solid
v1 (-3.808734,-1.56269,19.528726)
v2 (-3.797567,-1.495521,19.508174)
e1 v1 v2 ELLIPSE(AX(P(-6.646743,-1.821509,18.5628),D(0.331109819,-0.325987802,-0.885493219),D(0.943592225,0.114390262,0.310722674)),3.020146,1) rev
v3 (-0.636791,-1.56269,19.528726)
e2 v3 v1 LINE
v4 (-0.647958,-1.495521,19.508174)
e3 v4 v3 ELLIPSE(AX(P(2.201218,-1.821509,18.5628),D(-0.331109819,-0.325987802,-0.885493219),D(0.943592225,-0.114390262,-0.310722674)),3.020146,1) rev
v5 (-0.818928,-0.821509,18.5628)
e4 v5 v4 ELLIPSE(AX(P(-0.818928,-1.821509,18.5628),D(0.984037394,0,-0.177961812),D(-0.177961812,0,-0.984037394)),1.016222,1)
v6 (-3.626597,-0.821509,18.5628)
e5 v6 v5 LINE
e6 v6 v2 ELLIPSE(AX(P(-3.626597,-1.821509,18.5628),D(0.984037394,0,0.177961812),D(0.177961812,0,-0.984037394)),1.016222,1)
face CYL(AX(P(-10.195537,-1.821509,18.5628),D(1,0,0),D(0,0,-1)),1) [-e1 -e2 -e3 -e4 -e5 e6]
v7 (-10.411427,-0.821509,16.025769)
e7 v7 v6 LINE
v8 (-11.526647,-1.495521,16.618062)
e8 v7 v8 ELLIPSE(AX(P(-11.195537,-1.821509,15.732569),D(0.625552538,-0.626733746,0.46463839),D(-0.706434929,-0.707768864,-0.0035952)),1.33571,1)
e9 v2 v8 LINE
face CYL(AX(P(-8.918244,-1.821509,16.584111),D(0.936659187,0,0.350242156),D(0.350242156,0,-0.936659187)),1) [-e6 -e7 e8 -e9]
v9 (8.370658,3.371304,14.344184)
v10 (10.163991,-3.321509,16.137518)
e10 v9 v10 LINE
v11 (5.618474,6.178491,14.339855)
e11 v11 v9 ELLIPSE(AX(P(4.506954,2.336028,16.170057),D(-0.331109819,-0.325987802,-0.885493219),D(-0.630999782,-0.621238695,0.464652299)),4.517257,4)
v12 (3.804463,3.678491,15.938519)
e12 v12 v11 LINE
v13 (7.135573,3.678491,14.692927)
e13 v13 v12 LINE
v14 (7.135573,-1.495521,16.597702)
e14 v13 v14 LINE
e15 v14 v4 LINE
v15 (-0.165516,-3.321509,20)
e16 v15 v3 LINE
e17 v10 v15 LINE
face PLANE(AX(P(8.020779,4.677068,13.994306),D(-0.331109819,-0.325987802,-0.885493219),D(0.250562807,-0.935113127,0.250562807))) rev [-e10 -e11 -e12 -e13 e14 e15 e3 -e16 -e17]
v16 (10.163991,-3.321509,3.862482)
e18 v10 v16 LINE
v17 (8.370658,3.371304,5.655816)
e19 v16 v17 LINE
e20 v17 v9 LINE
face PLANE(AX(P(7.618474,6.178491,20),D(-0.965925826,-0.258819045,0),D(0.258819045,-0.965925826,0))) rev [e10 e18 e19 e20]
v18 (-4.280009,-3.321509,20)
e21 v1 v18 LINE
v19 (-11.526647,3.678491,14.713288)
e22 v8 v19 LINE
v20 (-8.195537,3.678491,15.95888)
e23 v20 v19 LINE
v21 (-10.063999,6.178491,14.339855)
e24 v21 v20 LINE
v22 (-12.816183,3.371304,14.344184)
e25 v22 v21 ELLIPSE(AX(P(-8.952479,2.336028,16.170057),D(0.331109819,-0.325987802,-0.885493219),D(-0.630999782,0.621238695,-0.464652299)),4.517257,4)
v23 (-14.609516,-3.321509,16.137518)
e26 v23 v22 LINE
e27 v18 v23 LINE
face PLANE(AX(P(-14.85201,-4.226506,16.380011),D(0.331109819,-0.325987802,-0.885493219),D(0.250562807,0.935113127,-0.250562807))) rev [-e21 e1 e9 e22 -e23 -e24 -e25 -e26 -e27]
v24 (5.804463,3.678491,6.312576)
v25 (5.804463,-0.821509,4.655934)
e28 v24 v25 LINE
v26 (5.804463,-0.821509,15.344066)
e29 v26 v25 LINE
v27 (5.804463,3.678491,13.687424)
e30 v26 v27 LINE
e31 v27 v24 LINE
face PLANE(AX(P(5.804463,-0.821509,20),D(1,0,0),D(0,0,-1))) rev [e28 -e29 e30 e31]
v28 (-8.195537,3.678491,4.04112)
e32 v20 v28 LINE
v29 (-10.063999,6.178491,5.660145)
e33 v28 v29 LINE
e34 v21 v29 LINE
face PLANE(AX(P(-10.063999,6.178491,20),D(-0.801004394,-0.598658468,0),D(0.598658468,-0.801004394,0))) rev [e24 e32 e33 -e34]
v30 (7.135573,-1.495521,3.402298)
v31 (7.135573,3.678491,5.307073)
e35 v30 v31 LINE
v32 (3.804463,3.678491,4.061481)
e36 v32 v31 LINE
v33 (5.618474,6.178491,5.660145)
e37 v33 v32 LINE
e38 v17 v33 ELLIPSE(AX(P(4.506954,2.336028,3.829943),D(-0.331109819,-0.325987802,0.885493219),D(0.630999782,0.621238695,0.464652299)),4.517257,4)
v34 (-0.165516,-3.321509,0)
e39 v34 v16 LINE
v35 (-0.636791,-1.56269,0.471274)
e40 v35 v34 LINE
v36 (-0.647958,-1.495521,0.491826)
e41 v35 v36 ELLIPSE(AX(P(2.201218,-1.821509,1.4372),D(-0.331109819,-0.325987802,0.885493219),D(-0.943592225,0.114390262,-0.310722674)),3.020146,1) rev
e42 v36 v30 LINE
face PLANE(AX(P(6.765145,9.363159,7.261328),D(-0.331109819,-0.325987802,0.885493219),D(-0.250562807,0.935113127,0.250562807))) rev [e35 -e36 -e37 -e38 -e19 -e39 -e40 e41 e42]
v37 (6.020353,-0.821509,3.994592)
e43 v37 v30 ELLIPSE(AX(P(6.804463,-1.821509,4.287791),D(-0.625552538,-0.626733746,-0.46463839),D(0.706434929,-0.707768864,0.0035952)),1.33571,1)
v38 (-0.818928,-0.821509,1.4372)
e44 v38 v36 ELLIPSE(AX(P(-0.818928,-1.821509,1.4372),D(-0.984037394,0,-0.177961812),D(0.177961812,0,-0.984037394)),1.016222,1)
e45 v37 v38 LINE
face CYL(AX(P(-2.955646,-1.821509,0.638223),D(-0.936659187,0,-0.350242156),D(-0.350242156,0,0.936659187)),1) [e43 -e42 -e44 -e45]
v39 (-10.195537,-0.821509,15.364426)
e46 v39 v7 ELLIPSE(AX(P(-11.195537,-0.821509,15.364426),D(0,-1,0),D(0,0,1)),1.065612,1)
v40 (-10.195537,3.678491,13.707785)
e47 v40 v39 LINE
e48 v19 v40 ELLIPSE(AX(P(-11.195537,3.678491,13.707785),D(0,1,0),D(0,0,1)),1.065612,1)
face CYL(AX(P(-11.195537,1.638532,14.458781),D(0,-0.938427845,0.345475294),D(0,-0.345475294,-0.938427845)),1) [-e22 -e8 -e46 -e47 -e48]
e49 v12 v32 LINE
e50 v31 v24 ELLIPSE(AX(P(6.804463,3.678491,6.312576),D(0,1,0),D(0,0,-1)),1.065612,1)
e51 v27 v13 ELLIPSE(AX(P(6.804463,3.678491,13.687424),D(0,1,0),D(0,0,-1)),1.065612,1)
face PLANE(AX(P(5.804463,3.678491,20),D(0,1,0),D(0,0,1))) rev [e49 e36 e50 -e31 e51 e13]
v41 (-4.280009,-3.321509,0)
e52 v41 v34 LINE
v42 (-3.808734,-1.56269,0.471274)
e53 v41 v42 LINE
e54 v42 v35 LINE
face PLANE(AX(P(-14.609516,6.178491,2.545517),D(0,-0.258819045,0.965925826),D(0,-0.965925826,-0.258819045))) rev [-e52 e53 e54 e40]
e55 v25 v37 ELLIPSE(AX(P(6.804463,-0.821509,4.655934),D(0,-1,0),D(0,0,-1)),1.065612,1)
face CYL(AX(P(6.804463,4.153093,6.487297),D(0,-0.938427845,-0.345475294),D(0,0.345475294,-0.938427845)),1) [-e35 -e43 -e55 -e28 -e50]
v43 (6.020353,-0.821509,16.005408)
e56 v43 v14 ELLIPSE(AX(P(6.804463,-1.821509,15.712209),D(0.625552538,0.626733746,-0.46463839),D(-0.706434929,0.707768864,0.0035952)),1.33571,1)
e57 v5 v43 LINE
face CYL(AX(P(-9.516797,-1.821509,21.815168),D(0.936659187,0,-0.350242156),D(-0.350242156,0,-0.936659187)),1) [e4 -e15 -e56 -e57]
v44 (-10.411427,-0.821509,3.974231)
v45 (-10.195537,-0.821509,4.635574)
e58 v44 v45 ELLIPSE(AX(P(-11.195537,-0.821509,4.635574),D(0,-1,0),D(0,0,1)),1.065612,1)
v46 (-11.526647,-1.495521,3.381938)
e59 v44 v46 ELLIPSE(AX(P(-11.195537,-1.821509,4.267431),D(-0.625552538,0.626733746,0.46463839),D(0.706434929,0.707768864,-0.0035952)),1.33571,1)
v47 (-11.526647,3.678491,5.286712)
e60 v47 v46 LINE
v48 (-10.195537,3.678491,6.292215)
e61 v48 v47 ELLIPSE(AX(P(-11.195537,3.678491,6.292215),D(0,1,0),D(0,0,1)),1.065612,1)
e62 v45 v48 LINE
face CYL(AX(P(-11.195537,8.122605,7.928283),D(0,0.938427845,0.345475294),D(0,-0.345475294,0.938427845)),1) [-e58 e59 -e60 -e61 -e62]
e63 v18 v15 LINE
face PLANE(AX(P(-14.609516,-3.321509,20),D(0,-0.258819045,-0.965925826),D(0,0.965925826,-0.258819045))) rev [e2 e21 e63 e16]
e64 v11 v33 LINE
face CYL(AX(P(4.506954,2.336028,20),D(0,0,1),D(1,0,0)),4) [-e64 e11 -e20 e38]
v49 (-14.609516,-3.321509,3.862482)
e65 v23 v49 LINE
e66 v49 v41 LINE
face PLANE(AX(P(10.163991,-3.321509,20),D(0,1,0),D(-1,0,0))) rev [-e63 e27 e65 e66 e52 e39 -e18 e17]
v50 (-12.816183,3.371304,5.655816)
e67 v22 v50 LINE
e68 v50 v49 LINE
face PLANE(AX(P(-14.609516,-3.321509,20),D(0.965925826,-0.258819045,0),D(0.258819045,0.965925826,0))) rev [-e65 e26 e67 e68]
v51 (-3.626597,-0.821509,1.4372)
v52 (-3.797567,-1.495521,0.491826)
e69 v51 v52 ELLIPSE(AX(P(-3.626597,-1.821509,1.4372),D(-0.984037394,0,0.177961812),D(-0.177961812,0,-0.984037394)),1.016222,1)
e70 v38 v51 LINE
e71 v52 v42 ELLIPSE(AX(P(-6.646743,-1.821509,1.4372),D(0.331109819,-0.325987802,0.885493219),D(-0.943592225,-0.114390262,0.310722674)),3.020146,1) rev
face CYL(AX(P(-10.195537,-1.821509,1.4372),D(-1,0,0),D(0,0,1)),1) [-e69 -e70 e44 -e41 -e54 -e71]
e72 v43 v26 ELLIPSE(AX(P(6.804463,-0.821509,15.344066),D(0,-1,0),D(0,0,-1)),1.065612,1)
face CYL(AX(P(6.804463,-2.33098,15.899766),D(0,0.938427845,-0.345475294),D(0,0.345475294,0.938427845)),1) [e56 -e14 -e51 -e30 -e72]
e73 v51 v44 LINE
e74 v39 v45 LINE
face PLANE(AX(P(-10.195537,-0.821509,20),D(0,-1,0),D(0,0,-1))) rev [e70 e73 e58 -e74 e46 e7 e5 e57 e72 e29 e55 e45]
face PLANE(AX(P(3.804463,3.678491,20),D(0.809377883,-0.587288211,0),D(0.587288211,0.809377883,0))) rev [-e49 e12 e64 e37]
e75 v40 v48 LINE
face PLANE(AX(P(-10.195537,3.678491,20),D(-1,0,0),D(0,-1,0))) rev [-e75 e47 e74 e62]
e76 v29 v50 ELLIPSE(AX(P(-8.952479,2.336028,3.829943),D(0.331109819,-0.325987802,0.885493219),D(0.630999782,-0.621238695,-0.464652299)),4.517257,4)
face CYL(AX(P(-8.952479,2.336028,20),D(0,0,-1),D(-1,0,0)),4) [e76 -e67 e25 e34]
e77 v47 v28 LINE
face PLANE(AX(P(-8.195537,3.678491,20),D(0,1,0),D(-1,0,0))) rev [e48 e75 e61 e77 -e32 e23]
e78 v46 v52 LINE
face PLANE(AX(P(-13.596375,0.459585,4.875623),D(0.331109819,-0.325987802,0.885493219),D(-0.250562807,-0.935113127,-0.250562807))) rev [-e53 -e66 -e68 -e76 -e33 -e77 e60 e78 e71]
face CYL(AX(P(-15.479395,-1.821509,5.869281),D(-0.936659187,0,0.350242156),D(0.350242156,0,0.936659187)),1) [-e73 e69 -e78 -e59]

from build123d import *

# Parameters (mm, degrees)
EXTRUDE_1_DEPTH          = 20
CUT_EXTRUDE_1_DEPTH      = 26.52668646
CUT_EXTRUDE_1_DEPTH_BACK = 26.52668646
FILLET_1_R               = 4
CHAMFER_1_SIZE           = 10
CHAMFER_1_SIZE_2         = 3.739269956
FILLET_2_R               = 1


with BuildPart() as part:
    # 草圖2 → 填料-伸長1 (new body)
    with BuildSketch(Plane.XY):
        Polygon((-8.195537152, 3.678491207), (-10.195537152, 3.678491207), (-10.195537152, -0.821508793), (5.804462848, -0.821508793), (5.804462848, 3.678491207), (3.804462848, 3.678491207), (5.618474025, 6.178491207), (7.618474025, 6.178491207), (10.163991353, -3.321508793), (-14.609516351, -3.321508793), (-12.063999023, 6.178491207), (-10.063999023, 6.178491207), align=None)
    extrude(amount=EXTRUDE_1_DEPTH)

    # 草圖3 → 除料-伸長1 (cut, two sides: drawn at the far end of the back side and taken through both)
    with BuildSketch(Plane(origin=(0, 0, 0), x_dir=(0, 0, -1), z_dir=(1, 0, 0)).offset(-CUT_EXTRUDE_1_DEPTH_BACK)):
        Polygon((-20, -3.321508793), (-17.454482672, 6.178491207), (-20, 6.178491207), align=None)
        Polygon((0, 6.178491207), (-2.545517328, 6.178491207), (0, -3.321508793), align=None)
    extrude(amount=CUT_EXTRUDE_1_DEPTH + CUT_EXTRUDE_1_DEPTH_BACK, mode=Mode.SUBTRACT)

    # 圓角1
    # the kernel refuses this fillet: 4 mm, written as the material it takes off along each edge
    with BuildSketch(Plane(origin=(7.618474025, 6.178491207, -4.720017408), x_dir=(-1, 0, 0), z_dir=(0, 0, 1))) as fillet_1_piece_1:
        with BuildLine():
            CenterArc((3.1115198, 3.842463238), FILLET_1_R, 195, 58.866285833)
            Line((-0.752183505, 2.807187057), (-0.829457571, 2.786481534))
            Line((-0.829457571, 2.786481534), (-0.077274066, -0.020705524))
            Line((-0.077274066, -0.020705524), (0, -0.08))
            ThreePointArc((0, -0.08), (1, -0.08), (1.977769604, -0.076849265))
            Line((1.977769604, -0.076849265), (2, 0))
        make_face()
    extrude(amount=29.440034816, mode=Mode.SUBTRACT)
    with BuildSketch(Plane(origin=(-12.063999023, 6.178491207, -4.720017408), x_dir=(1, 0, 0), z_dir=(0, 0, 1))) as fillet_1_piece_2:
        with BuildLine():
            CenterArc((3.1115198, -3.842463238), FILLET_1_R, 106.133714167, 58.866285833)
            Line((-0.752183505, -2.807187057), (-0.829457571, -2.786481534))
            Line((-0.829457571, -2.786481534), (-0.077274066, 0.020705524))
            Line((-0.077274066, 0.020705524), (0, 0.08))
            ThreePointArc((0, 0.08), (1, 0.08), (1.977769604, 0.076849265))
            Line((1.977769604, 0.076849265), (2, 0))
        make_face()
    extrude(amount=29.440034816, mode=Mode.SUBTRACT)

    # 導角1
    # the kernel refuses this chamfer: 10, 3.739269956 mm, written as the material it takes off along each edge
    with BuildSketch(Plane(origin=(16.664078496, -27.580164265, -6.500087143), x_dir=(-0.9680162049238082, -0.23859176587740763, -0.07757961240176374), z_dir=(-0.25056280708573614, 0.9351131265310298, 0.25056280708572526)), Plane(origin=(-6.316095385, 27.629959622, 8.293420966), x_dir=(0.9680162049238085, -0.23859176587740732, -0.0775796124017635), z_dir=(-0.2505628070857358, -0.93511312653103, -0.2505628070857253)), Plane(origin=(-21.109603495, -27.580164265, 26.500087143), x_dir=(0.9680162049238082, -0.23859176587740735, 0.07757961240176349), z_dir=(0.25056280708573586, 0.9351131265310301, -0.2505628070857251)), Plane(origin=(1.870570387, 27.629959622, 11.706579034), x_dir=(-0.9680162049238082, -0.23859176587740777, 0.07757961240176336), z_dir=(0.25056280708573614, -0.93511312653103, 0.25056280708572504))) as chamfer_1_piece_1:
        Polygon((CHAMFER_1_SIZE * 0.999913086528, CHAMFER_1_SIZE * 0.0131840581986), (-CHAMFER_1_SIZE_2 * 0.080135920558, CHAMFER_1_SIZE_2 * 0.996783945724), (0, 0), align=None)
    extrude(amount=59.041117401, mode=Mode.SUBTRACT)

    # 圓角2
    fillet_2_edges = [part.edges().sort_by_distance(p)[0] for p in [
        (5.804462848, 1.428491207, 16.018986119),
        (5.804462848, 1.428491207, 3.981013881),
        (-2.222762499, -0.821508793, 19.330127019),
        (-2.222762499, -0.821508793, 0.669872981),
        (2.484536748, -0.821508793, 18.088717027),
        (-6.902836399, -0.821508793, 18.098897319),
        (-6.902836399, -0.821508793, 1.901102681),
        (2.484536748, -0.821508793, 1.911282973),
        (-10.195537152, 1.428491207, 16.039346704),
        (-10.195537152, 1.428491207, 3.960653296),
    ]]
    fillet(fillet_2_edges, radius=FILLET_2_R)


solid = part.part
